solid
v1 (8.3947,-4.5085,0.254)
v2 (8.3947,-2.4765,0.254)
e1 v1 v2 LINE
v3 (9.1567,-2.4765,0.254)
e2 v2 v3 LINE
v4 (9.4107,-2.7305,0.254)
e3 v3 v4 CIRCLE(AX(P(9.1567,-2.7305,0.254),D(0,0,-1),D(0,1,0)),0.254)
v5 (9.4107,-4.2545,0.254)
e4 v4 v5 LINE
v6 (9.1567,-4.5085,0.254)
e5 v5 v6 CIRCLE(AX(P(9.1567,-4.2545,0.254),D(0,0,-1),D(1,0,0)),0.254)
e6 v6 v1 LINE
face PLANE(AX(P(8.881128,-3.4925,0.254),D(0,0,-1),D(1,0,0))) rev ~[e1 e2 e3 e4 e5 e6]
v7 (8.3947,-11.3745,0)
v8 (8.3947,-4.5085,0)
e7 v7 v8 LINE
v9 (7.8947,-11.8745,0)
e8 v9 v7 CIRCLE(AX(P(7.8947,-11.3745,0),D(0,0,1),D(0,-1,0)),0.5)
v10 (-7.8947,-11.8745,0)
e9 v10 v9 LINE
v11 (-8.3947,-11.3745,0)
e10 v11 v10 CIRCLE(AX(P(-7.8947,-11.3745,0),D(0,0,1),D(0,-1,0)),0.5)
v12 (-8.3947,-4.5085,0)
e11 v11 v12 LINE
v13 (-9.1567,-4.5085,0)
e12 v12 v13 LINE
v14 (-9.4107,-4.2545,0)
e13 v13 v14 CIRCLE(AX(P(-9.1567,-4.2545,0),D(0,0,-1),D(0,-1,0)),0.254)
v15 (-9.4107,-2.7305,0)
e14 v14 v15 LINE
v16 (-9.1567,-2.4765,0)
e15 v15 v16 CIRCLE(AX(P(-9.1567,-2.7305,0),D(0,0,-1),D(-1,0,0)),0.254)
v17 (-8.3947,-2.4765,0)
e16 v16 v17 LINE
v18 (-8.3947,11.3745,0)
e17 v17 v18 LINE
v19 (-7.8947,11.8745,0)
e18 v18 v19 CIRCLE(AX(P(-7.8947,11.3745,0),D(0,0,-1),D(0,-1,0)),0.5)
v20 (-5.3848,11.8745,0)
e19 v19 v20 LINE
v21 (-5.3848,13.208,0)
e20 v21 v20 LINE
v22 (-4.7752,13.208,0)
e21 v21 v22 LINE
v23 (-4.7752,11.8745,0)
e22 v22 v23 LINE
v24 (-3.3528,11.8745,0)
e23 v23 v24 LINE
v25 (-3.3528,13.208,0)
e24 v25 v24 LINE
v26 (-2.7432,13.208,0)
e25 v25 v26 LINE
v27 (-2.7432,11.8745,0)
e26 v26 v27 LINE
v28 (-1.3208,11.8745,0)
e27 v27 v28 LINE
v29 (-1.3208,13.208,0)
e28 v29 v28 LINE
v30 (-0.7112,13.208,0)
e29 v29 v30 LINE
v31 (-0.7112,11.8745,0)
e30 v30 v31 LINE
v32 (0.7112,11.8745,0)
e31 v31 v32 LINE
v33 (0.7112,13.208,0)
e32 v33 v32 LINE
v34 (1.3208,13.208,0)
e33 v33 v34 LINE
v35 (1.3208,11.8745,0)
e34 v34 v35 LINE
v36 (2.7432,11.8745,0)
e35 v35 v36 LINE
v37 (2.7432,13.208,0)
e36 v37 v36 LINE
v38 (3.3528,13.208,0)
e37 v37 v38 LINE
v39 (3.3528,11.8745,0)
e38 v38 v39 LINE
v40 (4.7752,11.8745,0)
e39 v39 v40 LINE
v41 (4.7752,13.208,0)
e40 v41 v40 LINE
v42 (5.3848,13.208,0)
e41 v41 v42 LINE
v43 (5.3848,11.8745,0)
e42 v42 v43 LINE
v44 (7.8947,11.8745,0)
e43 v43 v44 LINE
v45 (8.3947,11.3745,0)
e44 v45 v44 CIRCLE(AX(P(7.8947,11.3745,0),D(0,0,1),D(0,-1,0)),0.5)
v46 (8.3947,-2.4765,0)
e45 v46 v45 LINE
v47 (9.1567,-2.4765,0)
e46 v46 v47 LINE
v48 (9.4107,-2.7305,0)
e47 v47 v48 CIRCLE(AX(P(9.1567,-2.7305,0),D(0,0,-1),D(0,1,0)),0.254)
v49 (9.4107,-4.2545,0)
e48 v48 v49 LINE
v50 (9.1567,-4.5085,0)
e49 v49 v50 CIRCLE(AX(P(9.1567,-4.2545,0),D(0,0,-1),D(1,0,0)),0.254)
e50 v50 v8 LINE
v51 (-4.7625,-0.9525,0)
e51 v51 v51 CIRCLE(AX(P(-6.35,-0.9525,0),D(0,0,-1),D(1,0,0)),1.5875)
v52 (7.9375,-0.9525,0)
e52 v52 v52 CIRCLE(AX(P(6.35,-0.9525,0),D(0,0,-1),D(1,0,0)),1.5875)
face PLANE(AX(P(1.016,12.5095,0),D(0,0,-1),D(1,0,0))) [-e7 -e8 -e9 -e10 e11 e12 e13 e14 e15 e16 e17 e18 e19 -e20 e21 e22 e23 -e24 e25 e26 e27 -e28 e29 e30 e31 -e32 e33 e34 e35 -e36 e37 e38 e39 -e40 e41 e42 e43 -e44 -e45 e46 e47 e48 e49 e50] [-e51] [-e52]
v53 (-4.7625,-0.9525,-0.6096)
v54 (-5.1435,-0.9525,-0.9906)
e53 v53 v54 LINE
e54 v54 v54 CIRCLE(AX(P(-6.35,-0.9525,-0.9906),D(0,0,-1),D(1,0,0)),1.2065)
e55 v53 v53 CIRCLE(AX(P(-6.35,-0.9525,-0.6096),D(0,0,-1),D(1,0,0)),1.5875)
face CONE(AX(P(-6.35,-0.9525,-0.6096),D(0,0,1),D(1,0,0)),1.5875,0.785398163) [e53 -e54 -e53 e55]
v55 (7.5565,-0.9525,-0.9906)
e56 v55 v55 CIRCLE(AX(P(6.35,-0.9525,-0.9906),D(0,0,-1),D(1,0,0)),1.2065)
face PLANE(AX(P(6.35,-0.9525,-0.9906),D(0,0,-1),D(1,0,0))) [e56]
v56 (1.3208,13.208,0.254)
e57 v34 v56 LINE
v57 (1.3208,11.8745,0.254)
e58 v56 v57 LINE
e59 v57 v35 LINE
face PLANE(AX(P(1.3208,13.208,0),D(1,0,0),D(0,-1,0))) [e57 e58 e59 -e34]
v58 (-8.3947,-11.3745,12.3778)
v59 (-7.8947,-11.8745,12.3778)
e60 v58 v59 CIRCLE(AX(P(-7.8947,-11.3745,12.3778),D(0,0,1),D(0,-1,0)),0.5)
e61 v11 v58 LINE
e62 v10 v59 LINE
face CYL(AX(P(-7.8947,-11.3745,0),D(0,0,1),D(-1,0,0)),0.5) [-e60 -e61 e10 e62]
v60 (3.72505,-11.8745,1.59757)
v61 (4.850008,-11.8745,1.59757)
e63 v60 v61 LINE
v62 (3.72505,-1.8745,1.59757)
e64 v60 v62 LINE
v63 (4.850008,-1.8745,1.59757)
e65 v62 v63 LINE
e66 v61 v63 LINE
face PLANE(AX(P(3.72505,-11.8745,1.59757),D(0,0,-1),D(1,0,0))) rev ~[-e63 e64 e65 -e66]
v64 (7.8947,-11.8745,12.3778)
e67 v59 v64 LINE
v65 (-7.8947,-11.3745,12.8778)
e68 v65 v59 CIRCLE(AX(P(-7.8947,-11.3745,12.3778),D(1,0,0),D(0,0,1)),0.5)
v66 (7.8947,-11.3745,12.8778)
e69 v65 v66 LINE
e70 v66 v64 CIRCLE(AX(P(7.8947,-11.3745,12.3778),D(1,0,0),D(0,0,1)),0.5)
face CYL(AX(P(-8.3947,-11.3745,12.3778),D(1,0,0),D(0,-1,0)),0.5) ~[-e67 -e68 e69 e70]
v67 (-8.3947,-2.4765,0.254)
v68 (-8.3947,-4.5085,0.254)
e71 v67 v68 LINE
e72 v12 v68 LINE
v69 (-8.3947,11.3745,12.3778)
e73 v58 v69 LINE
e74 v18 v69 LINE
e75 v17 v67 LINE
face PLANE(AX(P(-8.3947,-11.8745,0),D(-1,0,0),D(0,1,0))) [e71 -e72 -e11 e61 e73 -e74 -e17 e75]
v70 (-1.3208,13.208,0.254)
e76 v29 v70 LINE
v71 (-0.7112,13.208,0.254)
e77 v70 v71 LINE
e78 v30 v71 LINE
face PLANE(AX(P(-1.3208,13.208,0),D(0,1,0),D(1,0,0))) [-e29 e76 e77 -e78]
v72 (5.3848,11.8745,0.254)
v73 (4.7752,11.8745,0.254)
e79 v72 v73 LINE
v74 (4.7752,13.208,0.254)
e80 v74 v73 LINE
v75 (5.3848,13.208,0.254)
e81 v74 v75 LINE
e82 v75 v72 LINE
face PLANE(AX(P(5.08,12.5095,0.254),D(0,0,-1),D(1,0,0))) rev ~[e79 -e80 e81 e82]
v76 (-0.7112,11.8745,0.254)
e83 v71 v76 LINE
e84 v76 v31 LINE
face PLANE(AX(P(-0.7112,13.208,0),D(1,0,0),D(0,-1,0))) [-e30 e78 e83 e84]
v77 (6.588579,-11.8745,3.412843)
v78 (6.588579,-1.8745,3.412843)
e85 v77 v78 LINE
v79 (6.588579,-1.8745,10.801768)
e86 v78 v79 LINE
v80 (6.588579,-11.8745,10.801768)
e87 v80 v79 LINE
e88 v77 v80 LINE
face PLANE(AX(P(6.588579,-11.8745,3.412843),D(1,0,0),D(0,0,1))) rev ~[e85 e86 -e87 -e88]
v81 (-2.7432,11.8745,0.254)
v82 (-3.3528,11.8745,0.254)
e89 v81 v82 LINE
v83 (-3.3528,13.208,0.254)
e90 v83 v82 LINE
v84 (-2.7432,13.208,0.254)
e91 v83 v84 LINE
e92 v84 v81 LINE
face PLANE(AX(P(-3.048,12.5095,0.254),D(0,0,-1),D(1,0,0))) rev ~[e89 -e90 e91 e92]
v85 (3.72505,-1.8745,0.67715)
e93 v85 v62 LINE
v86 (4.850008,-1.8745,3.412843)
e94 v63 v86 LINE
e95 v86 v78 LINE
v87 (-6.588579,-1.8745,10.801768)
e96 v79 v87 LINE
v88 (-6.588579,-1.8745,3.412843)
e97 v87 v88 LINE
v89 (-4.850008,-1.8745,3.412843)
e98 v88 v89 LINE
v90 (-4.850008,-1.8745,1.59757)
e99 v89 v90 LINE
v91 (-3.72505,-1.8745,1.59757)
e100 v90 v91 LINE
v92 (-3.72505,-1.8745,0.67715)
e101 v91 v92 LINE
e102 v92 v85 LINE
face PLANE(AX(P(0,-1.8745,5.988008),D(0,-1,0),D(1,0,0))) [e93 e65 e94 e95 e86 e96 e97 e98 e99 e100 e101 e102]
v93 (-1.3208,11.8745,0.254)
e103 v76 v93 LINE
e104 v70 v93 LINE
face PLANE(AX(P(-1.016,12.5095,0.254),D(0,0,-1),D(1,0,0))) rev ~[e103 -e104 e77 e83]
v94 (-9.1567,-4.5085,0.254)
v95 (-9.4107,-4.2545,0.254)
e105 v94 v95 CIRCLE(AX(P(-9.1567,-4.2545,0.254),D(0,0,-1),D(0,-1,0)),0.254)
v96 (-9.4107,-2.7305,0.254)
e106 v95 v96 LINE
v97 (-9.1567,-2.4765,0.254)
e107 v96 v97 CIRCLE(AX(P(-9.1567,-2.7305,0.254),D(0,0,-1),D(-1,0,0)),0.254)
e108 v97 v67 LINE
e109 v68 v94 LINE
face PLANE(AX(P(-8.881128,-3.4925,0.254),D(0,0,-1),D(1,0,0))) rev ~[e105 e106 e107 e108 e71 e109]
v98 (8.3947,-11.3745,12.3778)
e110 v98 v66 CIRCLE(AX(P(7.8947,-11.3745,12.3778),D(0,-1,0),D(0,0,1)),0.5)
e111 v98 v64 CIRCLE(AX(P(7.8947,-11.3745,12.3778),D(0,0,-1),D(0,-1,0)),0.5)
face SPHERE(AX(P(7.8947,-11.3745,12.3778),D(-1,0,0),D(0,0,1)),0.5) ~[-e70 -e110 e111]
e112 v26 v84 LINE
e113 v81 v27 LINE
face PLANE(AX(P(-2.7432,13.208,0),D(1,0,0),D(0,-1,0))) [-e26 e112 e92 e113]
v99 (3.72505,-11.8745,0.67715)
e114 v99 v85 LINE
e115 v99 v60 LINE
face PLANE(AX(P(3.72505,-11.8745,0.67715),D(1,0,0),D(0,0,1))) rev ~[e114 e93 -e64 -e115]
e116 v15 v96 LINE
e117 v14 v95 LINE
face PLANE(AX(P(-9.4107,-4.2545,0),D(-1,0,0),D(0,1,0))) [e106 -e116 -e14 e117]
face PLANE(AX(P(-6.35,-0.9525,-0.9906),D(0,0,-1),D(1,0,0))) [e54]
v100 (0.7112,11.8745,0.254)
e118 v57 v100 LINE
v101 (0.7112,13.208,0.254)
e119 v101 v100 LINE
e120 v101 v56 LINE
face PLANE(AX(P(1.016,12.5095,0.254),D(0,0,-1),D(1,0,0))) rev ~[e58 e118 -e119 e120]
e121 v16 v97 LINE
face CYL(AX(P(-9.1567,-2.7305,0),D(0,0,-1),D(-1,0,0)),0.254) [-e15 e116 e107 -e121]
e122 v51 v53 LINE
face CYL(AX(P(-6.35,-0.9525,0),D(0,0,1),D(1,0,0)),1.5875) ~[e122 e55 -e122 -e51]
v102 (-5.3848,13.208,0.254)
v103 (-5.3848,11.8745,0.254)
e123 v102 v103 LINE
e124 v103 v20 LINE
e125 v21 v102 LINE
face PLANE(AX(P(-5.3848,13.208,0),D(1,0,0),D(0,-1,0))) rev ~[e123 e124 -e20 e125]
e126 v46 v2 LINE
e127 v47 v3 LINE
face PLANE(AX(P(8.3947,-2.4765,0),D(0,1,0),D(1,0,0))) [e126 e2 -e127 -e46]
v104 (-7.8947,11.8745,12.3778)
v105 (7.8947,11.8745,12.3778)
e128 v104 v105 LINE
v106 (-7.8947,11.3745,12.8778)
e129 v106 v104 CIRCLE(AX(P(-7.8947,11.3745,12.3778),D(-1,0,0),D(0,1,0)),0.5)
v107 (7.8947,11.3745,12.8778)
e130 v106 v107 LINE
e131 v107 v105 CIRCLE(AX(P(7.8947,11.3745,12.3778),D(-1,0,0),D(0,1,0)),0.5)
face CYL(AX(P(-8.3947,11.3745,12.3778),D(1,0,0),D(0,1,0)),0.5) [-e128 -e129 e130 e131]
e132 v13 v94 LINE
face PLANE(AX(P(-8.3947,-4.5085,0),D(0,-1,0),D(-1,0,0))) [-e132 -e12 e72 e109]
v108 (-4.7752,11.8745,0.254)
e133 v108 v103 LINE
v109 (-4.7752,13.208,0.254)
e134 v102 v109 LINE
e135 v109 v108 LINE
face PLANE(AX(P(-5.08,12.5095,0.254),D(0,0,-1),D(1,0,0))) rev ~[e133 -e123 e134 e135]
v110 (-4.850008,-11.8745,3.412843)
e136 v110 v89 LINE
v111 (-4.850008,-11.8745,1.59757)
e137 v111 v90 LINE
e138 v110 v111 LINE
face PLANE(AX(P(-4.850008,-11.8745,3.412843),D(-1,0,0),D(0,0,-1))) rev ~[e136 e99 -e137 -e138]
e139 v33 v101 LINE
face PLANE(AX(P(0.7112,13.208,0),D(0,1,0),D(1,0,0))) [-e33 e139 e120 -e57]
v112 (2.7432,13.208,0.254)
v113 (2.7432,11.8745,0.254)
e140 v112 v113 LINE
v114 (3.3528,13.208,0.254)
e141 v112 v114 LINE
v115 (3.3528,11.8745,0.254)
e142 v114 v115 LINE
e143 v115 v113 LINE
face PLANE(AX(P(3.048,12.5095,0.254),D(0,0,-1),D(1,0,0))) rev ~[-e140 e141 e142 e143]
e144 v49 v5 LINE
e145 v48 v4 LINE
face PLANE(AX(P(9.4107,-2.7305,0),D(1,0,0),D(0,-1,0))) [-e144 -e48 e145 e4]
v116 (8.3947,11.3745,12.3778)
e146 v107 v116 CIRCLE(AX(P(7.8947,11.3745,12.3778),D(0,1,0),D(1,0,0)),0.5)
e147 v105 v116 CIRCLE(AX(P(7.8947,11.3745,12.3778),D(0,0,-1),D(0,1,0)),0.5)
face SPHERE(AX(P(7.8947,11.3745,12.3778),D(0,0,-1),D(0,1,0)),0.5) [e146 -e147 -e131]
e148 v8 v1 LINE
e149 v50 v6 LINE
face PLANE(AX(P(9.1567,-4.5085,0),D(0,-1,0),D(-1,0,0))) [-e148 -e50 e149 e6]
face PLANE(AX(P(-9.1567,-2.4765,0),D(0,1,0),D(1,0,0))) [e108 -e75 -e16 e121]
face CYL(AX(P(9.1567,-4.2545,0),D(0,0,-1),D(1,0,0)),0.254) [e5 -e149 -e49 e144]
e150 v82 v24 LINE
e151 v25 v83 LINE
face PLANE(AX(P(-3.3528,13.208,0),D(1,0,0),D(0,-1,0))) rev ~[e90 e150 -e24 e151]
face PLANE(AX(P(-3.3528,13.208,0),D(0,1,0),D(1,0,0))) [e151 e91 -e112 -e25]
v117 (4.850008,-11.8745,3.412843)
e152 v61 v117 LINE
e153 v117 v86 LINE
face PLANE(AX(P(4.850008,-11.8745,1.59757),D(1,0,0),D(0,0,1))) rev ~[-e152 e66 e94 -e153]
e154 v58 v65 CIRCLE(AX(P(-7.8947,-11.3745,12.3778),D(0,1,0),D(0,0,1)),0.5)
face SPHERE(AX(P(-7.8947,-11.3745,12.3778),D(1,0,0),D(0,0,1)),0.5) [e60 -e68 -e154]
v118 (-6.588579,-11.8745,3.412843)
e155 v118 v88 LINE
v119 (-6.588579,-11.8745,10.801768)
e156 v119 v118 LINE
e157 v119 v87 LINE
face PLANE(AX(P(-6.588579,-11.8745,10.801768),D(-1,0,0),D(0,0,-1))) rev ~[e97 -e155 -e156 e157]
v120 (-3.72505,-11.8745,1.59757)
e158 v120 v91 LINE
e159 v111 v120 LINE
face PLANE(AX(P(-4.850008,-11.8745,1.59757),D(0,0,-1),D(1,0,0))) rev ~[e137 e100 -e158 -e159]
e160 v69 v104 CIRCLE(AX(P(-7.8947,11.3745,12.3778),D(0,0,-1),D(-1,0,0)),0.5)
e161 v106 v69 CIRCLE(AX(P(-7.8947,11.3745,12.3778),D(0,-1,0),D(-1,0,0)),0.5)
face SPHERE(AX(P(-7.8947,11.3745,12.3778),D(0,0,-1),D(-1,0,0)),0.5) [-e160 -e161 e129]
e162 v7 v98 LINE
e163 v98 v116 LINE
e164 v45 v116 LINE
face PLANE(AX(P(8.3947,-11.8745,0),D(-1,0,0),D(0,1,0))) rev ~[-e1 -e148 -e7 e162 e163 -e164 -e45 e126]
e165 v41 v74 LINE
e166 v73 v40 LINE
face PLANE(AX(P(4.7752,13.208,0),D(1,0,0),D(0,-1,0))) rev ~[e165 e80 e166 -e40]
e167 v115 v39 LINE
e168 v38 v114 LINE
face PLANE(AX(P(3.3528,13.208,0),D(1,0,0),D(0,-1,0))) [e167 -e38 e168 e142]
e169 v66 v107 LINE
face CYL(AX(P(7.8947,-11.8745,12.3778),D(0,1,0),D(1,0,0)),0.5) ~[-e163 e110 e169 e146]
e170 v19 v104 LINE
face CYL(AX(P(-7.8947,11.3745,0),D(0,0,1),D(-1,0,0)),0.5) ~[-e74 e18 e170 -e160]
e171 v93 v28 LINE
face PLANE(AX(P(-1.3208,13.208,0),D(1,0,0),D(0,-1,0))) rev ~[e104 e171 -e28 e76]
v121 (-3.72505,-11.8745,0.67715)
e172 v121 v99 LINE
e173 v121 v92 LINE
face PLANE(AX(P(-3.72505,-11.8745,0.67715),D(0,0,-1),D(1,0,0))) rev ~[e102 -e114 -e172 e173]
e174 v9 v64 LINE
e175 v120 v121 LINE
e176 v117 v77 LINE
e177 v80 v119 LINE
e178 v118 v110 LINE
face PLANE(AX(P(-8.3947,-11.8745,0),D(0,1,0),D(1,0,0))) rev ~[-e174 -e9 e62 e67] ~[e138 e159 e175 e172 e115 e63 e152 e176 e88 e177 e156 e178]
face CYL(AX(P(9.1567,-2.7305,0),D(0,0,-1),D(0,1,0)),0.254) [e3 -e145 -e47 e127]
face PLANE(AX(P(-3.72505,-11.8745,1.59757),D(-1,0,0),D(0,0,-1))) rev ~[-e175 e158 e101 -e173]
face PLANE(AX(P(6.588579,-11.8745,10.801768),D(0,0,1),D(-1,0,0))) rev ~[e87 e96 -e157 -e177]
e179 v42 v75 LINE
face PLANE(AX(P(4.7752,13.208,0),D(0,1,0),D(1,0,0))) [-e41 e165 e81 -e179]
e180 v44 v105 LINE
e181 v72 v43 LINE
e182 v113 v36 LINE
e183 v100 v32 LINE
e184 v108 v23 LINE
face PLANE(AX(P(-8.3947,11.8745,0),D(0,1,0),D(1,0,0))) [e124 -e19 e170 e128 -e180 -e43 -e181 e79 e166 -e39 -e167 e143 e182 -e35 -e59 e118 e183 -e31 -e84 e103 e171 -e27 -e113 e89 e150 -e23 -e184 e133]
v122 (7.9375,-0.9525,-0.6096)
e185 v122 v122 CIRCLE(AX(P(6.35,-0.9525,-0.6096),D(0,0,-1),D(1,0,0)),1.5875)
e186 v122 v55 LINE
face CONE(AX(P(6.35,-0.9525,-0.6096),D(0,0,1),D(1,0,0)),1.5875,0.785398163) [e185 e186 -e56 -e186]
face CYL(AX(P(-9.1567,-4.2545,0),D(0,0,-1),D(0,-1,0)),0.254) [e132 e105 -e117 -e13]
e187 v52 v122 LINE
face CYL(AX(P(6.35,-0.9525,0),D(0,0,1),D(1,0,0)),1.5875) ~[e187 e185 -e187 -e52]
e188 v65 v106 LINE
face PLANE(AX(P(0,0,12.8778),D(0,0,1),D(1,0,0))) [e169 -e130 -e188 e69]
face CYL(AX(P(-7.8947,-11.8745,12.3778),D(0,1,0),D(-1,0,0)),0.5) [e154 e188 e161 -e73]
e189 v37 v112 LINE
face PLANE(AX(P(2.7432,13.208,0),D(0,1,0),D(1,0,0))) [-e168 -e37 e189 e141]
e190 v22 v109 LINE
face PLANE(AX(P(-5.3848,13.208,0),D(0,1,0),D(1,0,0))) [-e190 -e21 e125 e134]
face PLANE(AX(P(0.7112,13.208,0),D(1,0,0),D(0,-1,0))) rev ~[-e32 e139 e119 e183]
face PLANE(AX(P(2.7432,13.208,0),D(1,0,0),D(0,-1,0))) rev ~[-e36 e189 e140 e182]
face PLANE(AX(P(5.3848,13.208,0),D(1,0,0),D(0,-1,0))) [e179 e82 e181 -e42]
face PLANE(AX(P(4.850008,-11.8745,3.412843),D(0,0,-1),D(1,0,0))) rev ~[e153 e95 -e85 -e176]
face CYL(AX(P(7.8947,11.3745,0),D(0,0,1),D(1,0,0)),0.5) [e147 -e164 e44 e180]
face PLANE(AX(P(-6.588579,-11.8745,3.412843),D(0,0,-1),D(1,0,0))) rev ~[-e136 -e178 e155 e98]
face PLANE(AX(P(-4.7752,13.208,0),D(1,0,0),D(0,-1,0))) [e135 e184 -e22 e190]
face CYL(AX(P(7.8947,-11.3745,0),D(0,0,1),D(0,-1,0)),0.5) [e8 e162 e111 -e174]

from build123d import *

# Parameters (mm, degrees)
F0_W     = 16.7894
F0_H     = 23.749
F1_DEPTH = 12.8778
F2_R     = 0.5
F4_DEPTH = 10
F5_R     = 1.5875
F6_DEPTH = 0.9906
F7_W     = 0.6096
F7_H     = 1.397
F8_DEPTH = 0.254
F9_SIZE  = 0.381


with BuildPart() as f1:
    # F0 (on Top) → F1 (new body)
    with BuildSketch(Plane.XY):
        Rectangle(F0_W, F0_H)
    extrude(amount=F1_DEPTH)

    # F2
    f2_edges = [f1.edges().sort_by_distance(p)[0] for p in [
        (8.3947, 11.8745, 6.4389),
        (-8.3947, 11.8745, 6.4389),
        (0, -11.8745, 12.8778),
        (-8.3947, 0, 12.8778),
        (0, 11.8745, 12.8778),
        (8.3947, 0, 12.8778),
        (-8.3947, -11.8745, 6.4389),
        (8.3947, -11.8745, 6.4389),
    ]]
    fillet(f2_edges, radius=F2_R)

    # F3 (on face) → F4 (cut)
    with BuildSketch(Plane.XZ.offset(11.8745)):
        Polygon((6.5885786898, 10.8017679304), (0, 10.8017679304), (-6.5885786898, 10.8017679304), (-6.5885786898, 3.4128425177), (-4.8500075936, 3.4128425177), (-4.8500075936, 1.597570139), (-3.7250500172, 1.597570139), (-3.7250500172, 0.6771502085), (0, 0.6771502085), (3.7250500172, 0.6771502085), (3.7250500172, 1.597570139), (4.8500075936, 1.597570139), (4.8500075936, 3.4128425177), (6.5885786898, 3.4128425177), align=None)
    extrude(amount=-F4_DEPTH, mode=Mode.SUBTRACT)

    # F5 (on face) → F6 (join)
    with BuildSketch(Plane(origin=(0, 0, 0), x_dir=(1, 0, 0), z_dir=(0, 0, -1))):
        with Locations((6.35, 0.9525)):
            Circle(F5_R)
        with Locations((-6.35, 0.9525)):
            Circle(F5_R)
    extrude(amount=F6_DEPTH)

    # F7 (on face) → F8 (join)
    with BuildSketch(Plane(origin=(0, 0, 0), x_dir=(1, 0, 0), z_dir=(0, 0, -1))):
        with Locations((1.016, -12.5095)):
            Rectangle(F7_W, F7_H)
        with Locations((3.048, -12.5095)):
            Rectangle(F7_W, F7_H)
        with Locations((5.08, -12.5095)):
            Rectangle(F7_W, F7_H)
        with Locations((-1.016, -12.5095)):
            Rectangle(F7_W, F7_H)
        with Locations((-5.08, -12.5095)):
            Rectangle(F7_W, F7_H)
        with Locations((-3.048, -12.5095)):
            Rectangle(F7_W, F7_H)
        with BuildLine():
            Line((9.1567, 4.5085), (8.3947, 4.5085))
            Line((8.3947, 4.5085), (8.3947, 2.4765))
            Line((8.3947, 2.4765), (9.1567, 2.4765))
            ThreePointArc((9.1567, 2.4765), (9.3363051224, 2.5508948776), (9.4107, 2.7305))
            Line((9.4107, 2.7305), (9.4107, 4.2545))
            ThreePointArc((9.4107, 4.2545), (9.3363051224, 4.4341051224), (9.1567, 4.5085))
        make_face()
        with BuildLine():
            ThreePointArc((-9.1567, 4.5085), (-9.3363051224, 4.4341051224), (-9.4107, 4.2545))
            Line((-9.4107, 4.2545), (-9.4107, 2.7305))
            ThreePointArc((-9.4107, 2.7305), (-9.3363051224, 2.5508948776), (-9.1567, 2.4765))
            Line((-9.1567, 2.4765), (-8.3947, 2.4765))
            Line((-8.3947, 2.4765), (-8.3947, 4.5085))
            Line((-8.3947, 4.5085), (-9.1567, 4.5085))
        make_face()
    extrude(amount=-F8_DEPTH)

    # F9
    f9_edges = [f1.edges().sort_by_distance(p)[0] for p in [
        (4.7625, -0.9525, -0.9906),
        (-7.9375, -0.9525, -0.9906),
    ]]
    chamfer(f9_edges, length=F9_SIZE)


solid = f1.part
